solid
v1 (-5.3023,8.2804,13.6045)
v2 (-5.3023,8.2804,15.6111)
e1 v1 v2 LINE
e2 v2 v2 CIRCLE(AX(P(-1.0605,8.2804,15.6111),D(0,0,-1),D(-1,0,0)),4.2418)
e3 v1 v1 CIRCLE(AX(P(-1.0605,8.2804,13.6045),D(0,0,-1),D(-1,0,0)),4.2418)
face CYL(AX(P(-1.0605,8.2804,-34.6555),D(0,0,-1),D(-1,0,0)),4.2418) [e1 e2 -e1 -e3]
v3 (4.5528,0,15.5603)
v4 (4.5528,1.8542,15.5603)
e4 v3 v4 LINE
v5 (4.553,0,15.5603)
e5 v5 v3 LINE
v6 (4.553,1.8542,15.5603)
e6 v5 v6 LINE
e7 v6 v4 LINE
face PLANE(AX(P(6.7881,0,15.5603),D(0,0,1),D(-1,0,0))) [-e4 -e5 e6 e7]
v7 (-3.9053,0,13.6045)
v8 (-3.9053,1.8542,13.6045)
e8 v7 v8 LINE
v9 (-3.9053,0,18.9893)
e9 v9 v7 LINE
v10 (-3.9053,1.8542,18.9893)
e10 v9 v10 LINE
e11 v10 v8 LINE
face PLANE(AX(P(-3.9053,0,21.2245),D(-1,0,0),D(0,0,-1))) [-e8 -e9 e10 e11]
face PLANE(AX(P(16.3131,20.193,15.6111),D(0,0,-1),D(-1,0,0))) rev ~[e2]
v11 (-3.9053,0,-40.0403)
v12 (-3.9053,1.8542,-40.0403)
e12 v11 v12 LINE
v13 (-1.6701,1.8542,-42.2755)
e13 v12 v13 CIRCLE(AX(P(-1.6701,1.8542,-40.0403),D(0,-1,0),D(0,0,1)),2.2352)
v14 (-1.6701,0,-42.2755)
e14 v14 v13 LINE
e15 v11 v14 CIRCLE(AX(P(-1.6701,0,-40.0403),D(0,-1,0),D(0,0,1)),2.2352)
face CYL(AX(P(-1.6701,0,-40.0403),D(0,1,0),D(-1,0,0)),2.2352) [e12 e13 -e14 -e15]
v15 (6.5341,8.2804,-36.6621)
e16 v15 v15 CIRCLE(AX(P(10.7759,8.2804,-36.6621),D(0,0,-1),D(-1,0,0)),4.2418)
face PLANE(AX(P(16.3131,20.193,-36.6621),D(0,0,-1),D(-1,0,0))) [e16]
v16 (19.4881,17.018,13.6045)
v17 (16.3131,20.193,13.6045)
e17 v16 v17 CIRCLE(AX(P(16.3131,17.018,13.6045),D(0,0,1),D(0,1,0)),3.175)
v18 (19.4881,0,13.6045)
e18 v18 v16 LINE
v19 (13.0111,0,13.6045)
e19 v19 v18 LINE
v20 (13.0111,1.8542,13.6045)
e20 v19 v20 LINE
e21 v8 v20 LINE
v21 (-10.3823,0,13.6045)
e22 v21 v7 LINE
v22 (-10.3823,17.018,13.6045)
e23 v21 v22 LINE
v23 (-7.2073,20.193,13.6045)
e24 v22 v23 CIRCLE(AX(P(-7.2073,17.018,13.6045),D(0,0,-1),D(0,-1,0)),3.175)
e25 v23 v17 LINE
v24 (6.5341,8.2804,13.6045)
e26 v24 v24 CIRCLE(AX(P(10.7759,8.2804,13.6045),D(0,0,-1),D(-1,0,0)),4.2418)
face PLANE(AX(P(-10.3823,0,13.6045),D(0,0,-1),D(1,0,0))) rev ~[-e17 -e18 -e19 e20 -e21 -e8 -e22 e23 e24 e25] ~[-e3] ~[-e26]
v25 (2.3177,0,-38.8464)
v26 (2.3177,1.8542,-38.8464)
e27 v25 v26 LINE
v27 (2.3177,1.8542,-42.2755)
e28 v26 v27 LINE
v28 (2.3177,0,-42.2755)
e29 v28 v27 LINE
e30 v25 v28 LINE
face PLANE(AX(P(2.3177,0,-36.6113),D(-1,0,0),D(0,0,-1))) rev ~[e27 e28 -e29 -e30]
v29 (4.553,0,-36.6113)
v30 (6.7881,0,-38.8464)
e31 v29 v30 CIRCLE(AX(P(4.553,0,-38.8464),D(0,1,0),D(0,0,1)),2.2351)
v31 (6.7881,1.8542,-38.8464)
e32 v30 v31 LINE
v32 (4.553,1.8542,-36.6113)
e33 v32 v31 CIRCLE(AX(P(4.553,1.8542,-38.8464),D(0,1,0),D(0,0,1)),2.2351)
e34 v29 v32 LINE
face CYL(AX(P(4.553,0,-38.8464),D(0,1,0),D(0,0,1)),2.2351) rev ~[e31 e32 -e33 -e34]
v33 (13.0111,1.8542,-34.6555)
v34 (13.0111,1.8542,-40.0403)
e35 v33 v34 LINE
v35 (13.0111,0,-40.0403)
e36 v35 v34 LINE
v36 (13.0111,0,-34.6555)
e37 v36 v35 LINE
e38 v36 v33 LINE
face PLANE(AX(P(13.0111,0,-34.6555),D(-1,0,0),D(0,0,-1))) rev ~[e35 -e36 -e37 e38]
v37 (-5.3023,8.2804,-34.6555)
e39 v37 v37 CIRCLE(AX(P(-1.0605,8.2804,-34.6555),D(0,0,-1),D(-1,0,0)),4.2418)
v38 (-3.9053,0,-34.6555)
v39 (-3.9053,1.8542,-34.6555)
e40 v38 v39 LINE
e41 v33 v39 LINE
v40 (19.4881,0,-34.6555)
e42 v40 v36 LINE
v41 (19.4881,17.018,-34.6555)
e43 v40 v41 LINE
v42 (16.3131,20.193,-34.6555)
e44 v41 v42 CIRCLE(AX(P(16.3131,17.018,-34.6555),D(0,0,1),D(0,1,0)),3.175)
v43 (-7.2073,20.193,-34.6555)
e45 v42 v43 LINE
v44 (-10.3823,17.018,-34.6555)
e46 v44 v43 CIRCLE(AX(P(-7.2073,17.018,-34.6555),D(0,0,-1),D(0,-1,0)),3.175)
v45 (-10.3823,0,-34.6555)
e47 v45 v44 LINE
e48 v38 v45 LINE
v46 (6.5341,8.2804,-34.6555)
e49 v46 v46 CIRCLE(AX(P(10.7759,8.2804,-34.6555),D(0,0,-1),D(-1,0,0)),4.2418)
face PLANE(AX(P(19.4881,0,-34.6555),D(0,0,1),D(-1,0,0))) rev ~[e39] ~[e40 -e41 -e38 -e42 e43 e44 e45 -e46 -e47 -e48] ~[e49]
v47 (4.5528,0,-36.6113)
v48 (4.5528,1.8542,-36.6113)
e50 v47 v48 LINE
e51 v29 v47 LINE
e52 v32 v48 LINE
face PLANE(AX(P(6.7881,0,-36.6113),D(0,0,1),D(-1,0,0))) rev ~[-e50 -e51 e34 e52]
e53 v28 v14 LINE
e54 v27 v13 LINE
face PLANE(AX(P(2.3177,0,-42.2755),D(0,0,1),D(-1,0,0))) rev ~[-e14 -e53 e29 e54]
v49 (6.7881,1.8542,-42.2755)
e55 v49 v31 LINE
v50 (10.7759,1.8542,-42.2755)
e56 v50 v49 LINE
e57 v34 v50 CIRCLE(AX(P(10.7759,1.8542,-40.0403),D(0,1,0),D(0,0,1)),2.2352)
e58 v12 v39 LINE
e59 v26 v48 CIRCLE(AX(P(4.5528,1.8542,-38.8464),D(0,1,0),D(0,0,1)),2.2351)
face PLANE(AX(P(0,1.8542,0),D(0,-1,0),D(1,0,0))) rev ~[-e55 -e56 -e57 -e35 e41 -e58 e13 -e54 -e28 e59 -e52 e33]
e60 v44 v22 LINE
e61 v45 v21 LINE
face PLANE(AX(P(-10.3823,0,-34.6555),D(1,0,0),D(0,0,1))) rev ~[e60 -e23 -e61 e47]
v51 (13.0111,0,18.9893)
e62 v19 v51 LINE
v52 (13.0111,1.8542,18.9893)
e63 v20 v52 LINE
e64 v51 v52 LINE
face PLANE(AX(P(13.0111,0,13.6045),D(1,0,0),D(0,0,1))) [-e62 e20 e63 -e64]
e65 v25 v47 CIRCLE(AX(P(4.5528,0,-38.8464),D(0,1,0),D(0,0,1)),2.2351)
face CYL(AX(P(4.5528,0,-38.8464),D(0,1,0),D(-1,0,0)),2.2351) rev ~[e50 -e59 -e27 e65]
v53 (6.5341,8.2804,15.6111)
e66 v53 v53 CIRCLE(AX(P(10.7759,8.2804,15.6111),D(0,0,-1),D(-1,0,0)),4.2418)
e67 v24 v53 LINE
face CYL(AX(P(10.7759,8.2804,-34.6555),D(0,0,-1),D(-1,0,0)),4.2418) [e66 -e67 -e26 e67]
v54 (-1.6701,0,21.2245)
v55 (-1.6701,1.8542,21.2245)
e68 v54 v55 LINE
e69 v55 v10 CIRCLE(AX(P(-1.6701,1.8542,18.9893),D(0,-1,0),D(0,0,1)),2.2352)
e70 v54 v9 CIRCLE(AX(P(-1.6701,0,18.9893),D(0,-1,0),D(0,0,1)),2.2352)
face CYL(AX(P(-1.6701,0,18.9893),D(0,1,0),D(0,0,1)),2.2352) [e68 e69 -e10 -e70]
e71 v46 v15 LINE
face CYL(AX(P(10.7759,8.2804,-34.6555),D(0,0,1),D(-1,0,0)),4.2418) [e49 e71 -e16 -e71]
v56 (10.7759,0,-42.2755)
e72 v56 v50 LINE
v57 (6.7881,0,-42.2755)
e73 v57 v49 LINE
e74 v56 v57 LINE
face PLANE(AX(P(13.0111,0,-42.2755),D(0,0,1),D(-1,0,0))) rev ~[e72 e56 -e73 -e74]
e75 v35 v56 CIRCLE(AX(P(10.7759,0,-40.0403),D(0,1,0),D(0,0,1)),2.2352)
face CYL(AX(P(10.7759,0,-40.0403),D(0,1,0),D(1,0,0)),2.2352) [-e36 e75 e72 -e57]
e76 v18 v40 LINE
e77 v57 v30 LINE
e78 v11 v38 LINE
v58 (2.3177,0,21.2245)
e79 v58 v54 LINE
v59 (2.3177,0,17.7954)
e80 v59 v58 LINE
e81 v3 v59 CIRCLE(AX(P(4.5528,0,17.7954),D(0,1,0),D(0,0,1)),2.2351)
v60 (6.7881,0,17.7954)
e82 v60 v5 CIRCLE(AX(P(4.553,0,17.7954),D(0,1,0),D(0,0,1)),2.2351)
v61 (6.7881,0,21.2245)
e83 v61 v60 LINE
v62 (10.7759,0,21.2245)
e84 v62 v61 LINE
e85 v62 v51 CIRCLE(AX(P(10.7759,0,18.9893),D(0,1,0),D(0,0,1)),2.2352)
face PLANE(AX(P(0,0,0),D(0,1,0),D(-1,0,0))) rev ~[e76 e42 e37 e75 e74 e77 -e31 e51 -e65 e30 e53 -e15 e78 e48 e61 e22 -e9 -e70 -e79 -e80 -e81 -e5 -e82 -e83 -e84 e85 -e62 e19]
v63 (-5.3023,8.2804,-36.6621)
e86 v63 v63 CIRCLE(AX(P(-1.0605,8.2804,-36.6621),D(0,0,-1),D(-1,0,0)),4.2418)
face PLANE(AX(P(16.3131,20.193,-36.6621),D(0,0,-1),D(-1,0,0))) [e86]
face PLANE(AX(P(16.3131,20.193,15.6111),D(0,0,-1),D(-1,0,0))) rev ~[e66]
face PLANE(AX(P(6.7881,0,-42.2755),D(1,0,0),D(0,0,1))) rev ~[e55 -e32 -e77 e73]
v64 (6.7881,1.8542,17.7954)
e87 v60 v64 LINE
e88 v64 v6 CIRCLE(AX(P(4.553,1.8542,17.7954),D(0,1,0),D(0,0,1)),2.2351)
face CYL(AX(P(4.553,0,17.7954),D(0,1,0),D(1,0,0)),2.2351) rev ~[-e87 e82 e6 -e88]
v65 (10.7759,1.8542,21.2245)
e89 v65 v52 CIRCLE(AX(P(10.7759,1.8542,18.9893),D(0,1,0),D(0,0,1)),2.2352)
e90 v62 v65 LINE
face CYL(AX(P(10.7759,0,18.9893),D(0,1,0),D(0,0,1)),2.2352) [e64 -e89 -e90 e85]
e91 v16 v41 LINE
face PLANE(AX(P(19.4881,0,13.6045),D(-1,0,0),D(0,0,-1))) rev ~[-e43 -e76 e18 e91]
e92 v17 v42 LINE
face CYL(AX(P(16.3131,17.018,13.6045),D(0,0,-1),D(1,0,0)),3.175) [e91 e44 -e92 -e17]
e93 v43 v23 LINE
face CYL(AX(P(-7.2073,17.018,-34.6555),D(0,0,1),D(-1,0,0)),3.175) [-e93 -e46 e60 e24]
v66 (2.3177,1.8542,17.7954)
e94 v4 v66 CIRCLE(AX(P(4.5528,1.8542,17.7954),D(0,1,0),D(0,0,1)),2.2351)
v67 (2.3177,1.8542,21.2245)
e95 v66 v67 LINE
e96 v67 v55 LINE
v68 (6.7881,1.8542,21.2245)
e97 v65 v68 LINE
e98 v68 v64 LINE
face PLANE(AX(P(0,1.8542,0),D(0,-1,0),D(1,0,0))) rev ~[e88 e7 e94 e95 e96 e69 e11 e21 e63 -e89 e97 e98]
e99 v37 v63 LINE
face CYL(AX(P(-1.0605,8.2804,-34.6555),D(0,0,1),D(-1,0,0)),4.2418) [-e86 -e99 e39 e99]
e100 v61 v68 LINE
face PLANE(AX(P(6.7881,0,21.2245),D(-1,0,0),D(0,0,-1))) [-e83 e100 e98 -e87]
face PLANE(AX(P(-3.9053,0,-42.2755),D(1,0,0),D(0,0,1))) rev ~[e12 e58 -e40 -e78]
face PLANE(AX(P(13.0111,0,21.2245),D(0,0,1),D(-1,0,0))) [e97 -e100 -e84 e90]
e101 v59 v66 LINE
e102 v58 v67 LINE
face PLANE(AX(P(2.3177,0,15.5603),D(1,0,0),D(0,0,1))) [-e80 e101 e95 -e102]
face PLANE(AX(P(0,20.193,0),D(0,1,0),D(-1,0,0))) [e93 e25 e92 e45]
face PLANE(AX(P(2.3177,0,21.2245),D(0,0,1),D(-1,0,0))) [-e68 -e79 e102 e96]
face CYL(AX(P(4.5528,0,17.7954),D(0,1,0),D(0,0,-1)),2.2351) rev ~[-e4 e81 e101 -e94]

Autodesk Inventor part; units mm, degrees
ref_plane "YZ Plane" through (0, 0, 0) normal (1, 0, 0) x (0, 1, 0)
ref_plane "XZ Plane" through (0, 0, 0) normal (0, 1, 0) x (-1, 0, 0)
ref_plane "XY Plane" through (0, 0, 0) normal (0, 0, 1) x (1, 0, 0)
sketch "Sketch1" plane through (0, 0, 0) normal (0, 1, 0) x (-1, 0, 0)
  line L0 (10.3823, 13.6045) -> (-19.4881, 13.6045)
  line L1 (-19.4881, 13.6045) -> (-19.4881, -34.6555)
  line L2 (-19.4881, -34.6555) -> (10.3823, -34.6555)
  line L3 (10.3823, -34.6555) -> (10.3823, 13.6045)
  point P0 (0, 0)
  dimension "d0" = 48.26
  dimension "d1" = 29.8704
extrude "Extrusion1" add sketch "Sketch1" along normal blind 20.193
fillet "Fillet1" radius 3.175 2 edges at (19.4881, 20.193, -10.5255) (-10.3823, 20.193, -10.5255)
sketch "Sketch2" plane through (0, 0, 0) normal (0, -1, 0) x (1, 0, 0)
  line L0 (13.0111, -34.6555) -> (13.0111, -42.2755)
  line L1 (19.4881, 13.6045) -> (19.4881, -34.6555) projected
  line L2 (13.0111, -42.2755) -> (6.7881, -42.2755)
  line L3 (6.7881, -42.2755) -> (6.7881, -34.6555)
  line L4 (6.7881, -36.6113) -> (2.3177, -36.6113)
  line L5 (2.3177, -34.6555) -> (2.3177, -42.2755)
  line L6 (2.3177, -42.2755) -> (-3.9053, -42.2755)
  line L7 (-3.9053, -42.2755) -> (-3.9053, -34.6555)
  line L8 (-10.3823, -34.6555) -> (-10.3823, 13.6045) projected
  line L9 (19.4881, -10.5255) -> (-10.3823, -10.5255) construction
  line L10 (13.0111, 13.6045) -> (13.0111, 21.2245)
  line L11 (13.0111, 21.2245) -> (6.7881, 21.2245)
  line L12 (6.7881, 21.2245) -> (6.7881, 13.6045)
  line L13 (6.7881, 15.5603) -> (2.3177, 15.5603)
  line L14 (2.3177, 13.6045) -> (2.3177, 21.2245)
  line L15 (2.3177, 21.2245) -> (-3.9053, 21.2245)
  line L16 (-3.9053, 21.2245) -> (-3.9053, 13.6045)
  line L17 (13.0111, -34.6555) -> (6.7881, -34.6555)
  line L18 (2.3177, -34.6555) -> (-3.9053, -34.6555)
  line L19 (19.4881, -34.6555) -> (-10.3823, -34.6555) projected
  line L20 (6.7881, -34.6555) -> (2.3177, -34.6555)
  line L21 (13.0111, 13.6045) -> (6.7881, 13.6045)
  line L22 (-10.3823, 13.6045) -> (19.4881, 13.6045) projected
  line L23 (6.7881, 13.6045) -> (2.3177, 13.6045)
  line L24 (2.1667, 13.6045) -> (-3.9053, 13.6045)
  line L25 (6.7881, 13.6045) -> (2.3177, 13.6045)
  line L26 (2.3177, 13.6045) -> (2.3177, 15.5603)
  line L27 (2.3177, 15.5603) -> (6.7881, 15.5603)
  line L28 (6.7881, 15.5603) -> (6.7881, 13.6045)
  line L29 (6.7881, -36.6113) -> (2.3177, -36.6113)
  line L30 (2.3177, -36.6113) -> (2.3177, -34.6555)
  line L31 (2.3177, -34.6555) -> (6.7881, -34.6555)
  line L32 (6.7881, -34.6555) -> (6.7881, -36.6113)
  line L33 (-3.9053, 13.6045) -> (2.3177, 13.6045)
  line L34 (2.3177, 13.6045) -> (2.3177, 21.2245)
  line L35 (2.3177, 21.2245) -> (-3.9053, 21.2245)
  line L36 (-3.9053, 21.2245) -> (-3.9053, 13.6045)
  point P0 (0, 0)
  dimension "d5" = 6.477
  dimension "d6" = 7.62
  dimension "d7" = 6.223
  dimension "d9" = 4.4704
  dimension "d10" = 6.223
  dimension "d11" = 7.62
  dimension "d12" = 29.8704
  dimension "d13" = 4.4704
  dimension "d15" = 6.477
  dimension "d16" = 6.477
  dimension "d17" = 6.477
extrude "Extrusion2" add sketch "Sketch2" against normal blind 1.8542 contours L0 L2 L3 L17 | L3 L4 L5 L19 | L5 L6 L7 L18 | L21 L12 L11 L10 | L22 L14 L13 L12 | L22 L16 L15 L14
fillet "Fillet2" radius 2.2352 4 edges at (6.7881, 0.9271, 15.5603) (2.3177, 0.9271, 15.5603) (6.7881, 0.9271, -36.6113) (2.3177, 0.9271, -36.6113)
fillet "Fillet3" radius 2.2352 4 edges at (-3.9053, 0.9271, -42.2755) (13.0111, 0.9271, -42.2755) (13.0111, 0.9271, 21.2245) (-3.9053, 0.9271, 21.2245)
sketch "Sketch3" plane through (16.3131, 20.193, -34.6555) normal (0, 0, -1) x (-1, 0, 0)
  circle A0 centre (5.5372, -11.9126) radius 4.2418
  circle A1 centre (17.3736, -11.9126) radius 4.2418
  line L0 (20.2184, -20.193) -> (26.6954, -20.193) projected
  line L1 (-3.175, -20.193) -> (3.302, -20.193) projected
  line L2 (-3.175, -20.193) -> (-3.175, -3.175) projected
  line L3 (26.6954, -20.193) -> (26.6954, -3.175) projected
  point P0 (16.3131, -20.193)
  dimension "d22" = 8.4836
  dimension "d23" = 8.4836
  dimension "d24" = 8.2804
  dimension "d25" = 8.2804
  dimension "d26" = 11.8364
  dimension "d27" = 4.4704
  dimension "d28" = 5.08
extrude "Extrusion3" add sketch "Sketch3" along normal blind 2.0066 and the other way blind 50.2666
equation "\"d10\" = d7"
equation "\"d11\" = d6"
equation "\"d13\" = d9"
equation "\"d23\" = d22"
equation "\"d25\" = d24"
properties part number "LED Driver"
